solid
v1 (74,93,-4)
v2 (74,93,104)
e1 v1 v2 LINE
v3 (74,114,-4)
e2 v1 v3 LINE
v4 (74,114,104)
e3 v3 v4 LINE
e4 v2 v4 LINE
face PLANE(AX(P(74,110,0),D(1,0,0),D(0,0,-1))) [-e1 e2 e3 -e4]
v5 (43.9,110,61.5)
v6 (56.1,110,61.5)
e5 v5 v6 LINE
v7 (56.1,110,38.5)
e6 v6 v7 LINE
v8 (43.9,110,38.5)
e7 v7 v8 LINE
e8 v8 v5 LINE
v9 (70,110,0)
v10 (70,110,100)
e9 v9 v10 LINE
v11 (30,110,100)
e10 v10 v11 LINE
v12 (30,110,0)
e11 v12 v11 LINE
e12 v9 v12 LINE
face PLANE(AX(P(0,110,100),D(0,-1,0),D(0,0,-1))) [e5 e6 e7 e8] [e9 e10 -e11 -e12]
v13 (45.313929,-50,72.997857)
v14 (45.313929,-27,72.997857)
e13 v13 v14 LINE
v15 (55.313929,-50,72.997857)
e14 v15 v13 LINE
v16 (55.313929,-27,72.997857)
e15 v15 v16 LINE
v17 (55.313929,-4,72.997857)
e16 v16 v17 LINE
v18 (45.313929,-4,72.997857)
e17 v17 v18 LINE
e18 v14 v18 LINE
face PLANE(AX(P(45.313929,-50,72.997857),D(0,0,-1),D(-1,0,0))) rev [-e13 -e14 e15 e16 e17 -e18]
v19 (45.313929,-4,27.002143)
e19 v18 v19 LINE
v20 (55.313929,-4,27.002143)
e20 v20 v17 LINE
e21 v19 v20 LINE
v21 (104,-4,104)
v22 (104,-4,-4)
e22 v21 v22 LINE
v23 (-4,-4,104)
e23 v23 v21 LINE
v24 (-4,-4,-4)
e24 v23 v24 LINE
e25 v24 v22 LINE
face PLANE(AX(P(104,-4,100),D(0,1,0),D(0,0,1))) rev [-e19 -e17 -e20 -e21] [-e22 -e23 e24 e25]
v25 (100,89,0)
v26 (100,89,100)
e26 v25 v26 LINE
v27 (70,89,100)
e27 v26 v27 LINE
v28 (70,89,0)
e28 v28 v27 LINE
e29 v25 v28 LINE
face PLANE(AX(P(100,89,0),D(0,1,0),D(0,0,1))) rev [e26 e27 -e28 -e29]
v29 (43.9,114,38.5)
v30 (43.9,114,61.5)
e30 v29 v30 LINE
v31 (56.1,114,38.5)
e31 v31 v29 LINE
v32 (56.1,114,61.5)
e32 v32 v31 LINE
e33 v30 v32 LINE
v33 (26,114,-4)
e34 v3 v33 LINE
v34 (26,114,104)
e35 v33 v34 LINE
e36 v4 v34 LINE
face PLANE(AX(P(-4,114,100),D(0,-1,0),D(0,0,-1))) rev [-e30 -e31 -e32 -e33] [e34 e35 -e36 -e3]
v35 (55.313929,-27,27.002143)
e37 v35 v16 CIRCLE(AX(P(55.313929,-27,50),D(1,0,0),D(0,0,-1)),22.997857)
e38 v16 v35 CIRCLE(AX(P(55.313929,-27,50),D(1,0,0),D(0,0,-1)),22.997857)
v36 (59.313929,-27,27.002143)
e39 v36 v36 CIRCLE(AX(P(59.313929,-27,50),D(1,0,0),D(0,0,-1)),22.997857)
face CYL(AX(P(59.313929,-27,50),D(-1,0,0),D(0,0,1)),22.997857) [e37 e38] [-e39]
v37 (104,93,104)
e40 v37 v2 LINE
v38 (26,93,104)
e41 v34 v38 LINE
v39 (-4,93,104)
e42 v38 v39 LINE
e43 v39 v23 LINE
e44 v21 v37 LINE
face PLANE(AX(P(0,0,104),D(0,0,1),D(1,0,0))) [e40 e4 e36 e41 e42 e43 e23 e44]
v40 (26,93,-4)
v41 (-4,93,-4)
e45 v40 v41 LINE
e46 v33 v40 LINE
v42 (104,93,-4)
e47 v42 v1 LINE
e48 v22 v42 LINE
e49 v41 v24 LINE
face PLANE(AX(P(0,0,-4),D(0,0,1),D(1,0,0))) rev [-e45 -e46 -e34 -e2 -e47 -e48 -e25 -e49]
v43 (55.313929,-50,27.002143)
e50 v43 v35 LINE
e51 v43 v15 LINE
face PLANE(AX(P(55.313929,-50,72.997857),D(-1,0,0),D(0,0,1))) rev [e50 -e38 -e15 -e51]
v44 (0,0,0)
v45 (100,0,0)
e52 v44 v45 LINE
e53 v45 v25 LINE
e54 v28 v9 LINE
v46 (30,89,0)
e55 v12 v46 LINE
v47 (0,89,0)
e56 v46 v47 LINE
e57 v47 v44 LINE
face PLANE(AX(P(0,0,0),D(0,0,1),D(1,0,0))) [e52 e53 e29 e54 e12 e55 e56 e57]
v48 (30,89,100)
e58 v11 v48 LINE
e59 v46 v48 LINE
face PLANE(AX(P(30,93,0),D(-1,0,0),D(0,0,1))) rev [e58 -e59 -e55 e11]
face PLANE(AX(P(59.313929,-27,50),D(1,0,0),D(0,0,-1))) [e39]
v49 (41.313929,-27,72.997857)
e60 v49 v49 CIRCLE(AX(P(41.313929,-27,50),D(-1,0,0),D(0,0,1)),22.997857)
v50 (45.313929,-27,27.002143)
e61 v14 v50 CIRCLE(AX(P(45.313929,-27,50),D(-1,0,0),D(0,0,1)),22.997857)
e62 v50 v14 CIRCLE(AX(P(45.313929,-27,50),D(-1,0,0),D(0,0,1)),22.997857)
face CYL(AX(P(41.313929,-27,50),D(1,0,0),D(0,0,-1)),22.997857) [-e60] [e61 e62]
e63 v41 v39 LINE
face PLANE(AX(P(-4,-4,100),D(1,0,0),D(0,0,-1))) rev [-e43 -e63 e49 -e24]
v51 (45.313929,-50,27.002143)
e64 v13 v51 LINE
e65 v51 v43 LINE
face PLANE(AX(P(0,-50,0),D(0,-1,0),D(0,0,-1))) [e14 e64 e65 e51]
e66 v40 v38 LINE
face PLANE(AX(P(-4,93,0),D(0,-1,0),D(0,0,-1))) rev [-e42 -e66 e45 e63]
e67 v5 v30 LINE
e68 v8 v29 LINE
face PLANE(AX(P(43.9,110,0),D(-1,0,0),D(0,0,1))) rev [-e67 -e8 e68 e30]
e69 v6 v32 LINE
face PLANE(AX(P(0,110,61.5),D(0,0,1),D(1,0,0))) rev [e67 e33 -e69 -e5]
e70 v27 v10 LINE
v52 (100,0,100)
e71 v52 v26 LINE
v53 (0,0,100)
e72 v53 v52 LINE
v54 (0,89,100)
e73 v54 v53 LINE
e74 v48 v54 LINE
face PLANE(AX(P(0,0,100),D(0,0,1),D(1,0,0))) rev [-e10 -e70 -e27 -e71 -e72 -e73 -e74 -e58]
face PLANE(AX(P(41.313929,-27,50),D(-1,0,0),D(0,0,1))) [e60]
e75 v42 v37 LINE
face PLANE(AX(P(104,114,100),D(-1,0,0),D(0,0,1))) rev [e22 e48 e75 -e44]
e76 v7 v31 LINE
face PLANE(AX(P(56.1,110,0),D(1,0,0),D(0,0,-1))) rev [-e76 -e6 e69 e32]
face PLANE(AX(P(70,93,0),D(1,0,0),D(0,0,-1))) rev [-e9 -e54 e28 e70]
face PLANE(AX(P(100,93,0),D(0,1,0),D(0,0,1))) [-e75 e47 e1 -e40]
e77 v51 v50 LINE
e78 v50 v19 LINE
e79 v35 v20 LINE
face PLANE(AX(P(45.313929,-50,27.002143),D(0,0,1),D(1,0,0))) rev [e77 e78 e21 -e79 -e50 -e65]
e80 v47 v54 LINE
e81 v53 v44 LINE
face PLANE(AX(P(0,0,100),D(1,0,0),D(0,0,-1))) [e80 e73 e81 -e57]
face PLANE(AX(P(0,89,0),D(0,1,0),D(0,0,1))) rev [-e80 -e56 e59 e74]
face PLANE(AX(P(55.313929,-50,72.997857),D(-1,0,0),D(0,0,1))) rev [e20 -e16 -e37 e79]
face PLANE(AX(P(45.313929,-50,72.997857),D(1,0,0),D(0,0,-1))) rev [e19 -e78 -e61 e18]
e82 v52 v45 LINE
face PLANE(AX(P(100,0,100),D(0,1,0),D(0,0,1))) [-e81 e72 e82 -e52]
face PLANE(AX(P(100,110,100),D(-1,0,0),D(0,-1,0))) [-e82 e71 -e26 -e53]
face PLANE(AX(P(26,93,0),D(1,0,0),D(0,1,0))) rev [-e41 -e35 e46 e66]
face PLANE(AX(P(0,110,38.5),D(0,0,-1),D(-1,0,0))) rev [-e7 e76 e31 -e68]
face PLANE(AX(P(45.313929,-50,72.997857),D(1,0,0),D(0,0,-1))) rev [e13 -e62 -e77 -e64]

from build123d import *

# Parameters (mm, degrees)
SKETCH_1_W          = 100
SKETCH_1_H          = 110
EXTRUDE_1_DEPTH     = 100
SKETCH_2_W          = 30
SKETCH_2_H          = 21
CUT_EXTRUDE_1_DEPTH = 100
EXTRUDE_START       = -100
EXTRUDE_3_DEPTH     = 100
EXTRUDE_2_DEPTH     = 4
EXTRUDE_3_2_DEPTH   = 4
SKETCH_4_W          = 6.1
SKETCH_4_H          = 11.5
CUT_EXTRUDE_4_DEPTH = 4
SKETCH_6_W          = 10
SKETCH_6_H          = 45.995714962
EXTRUDE_4_DEPTH     = 46
SKETCH_7_R          = 22.997857481
EXTRUDE_5_DEPTH     = 4
EXTRUDE_START_2     = 4
SKETCH_8_R          = 22.997857481
EXTRUDE_6_DEPTH     = 4


# Read off the part's stored shape, not the designer's step: 拉伸-薄壁3
with BuildPart() as part:
    # 草图1 → 凸台-拉伸1 (new body)
    with BuildSketch(Plane.XY):
        Polygon((-4, 0), (-4, 114), (104, 114), (104, -4), (-4, -4), align=None)
        with Locations((50, 55)):
            Rectangle(SKETCH_1_W, SKETCH_1_H, mode=Mode.SUBTRACT)
    extrude(amount=EXTRUDE_1_DEPTH)

    # 草图2 → 切除-拉伸1 (cut)
    with BuildSketch(Plane.XY.offset(100)):
        with Locations((11, 103.5)):
            Rectangle(SKETCH_2_W, SKETCH_2_H)
    cut_extrude_1 = extrude(amount=-CUT_EXTRUDE_1_DEPTH, mode=Mode.SUBTRACT)

    # Extrude 3 outline → Extrude 3 (add)
    with BuildSketch(Plane.XY.offset(100).offset(EXTRUDE_START)):
        Polygon((74, 110), (70, 110), (70, 89), (100, 89), (100, 93), (74, 93), align=None)
        Polygon((26, 93), (0, 93), (0, 89), (30, 89), (30, 110), (26, 110), align=None)
    extrude(amount=EXTRUDE_3_DEPTH)

    # 镜向1: 切除-拉伸1 across plane
    add(cut_extrude_1.mirror(Plane(origin=(50, 0, 0), x_dir=(0, 0, 1), z_dir=(1, 0, 0))), mode=Mode.SUBTRACT)

    # 草图3<3> → 凸台-拉伸2 (add)
    with BuildSketch(Plane.XY.offset(100)):
        Polygon((26, 93), (-4, 93), (-4, -4), (104, -4), (104, 93), (74, 93), (74, 114), (26, 114), align=None)
    extrude(amount=EXTRUDE_2_DEPTH)

    # 草图3<4> → Extrude 3 2 (add)
    with BuildSketch(Plane.XY.offset(100).offset(EXTRUDE_START)):
        Polygon((26, 93), (-4, 93), (-4, -4), (104, -4), (104, 93), (74, 93), (74, 114), (26, 114), align=None)
    extrude(amount=-EXTRUDE_3_2_DEPTH)

    # 草图4 → 切除-拉伸4 (cut)
    with BuildSketch(Plane(origin=(0, 114, 0), x_dir=(1, 0, 0), z_dir=(0, 1, 0))):
        with Locations((46.95, -44.25)):
            Rectangle(SKETCH_4_W, SKETCH_4_H)
        with Locations((53.05, -44.25)):
            Rectangle(SKETCH_4_W, SKETCH_4_H)
        with Locations((46.95, -55.75)):
            Rectangle(SKETCH_4_W, SKETCH_4_H)
        with Locations((53.05, -55.75)):
            Rectangle(SKETCH_4_W, SKETCH_4_H)
    extrude(amount=-CUT_EXTRUDE_4_DEPTH, mode=Mode.SUBTRACT)

    # 草图6 → 凸台-拉伸4 (add)
    with BuildSketch(Plane.XZ.offset(4)):
        with Locations((50.313928752, 50)):
            Rectangle(SKETCH_6_W, SKETCH_6_H)
    extrude(amount=EXTRUDE_4_DEPTH)

    # 草图7 → 凸台-拉伸5 (add)
    with BuildSketch(Plane(origin=(55.313928752, 0, 0), x_dir=(0, 0, -1), z_dir=(1, 0, 0))):
        with Locations((-50, -27)):
            Circle(SKETCH_7_R)
    extrude(amount=EXTRUDE_5_DEPTH)

    # 草图8 → 凸台-拉伸6 (add)
    with BuildSketch(Plane.ZY.offset(-45.313928752).offset(EXTRUDE_START_2)):
        with Locations(Location((50, -27, 0), (0, 0, 180))):
            Circle(SKETCH_8_R)
    extrude(amount=-EXTRUDE_6_DEPTH)


solid = part.part
